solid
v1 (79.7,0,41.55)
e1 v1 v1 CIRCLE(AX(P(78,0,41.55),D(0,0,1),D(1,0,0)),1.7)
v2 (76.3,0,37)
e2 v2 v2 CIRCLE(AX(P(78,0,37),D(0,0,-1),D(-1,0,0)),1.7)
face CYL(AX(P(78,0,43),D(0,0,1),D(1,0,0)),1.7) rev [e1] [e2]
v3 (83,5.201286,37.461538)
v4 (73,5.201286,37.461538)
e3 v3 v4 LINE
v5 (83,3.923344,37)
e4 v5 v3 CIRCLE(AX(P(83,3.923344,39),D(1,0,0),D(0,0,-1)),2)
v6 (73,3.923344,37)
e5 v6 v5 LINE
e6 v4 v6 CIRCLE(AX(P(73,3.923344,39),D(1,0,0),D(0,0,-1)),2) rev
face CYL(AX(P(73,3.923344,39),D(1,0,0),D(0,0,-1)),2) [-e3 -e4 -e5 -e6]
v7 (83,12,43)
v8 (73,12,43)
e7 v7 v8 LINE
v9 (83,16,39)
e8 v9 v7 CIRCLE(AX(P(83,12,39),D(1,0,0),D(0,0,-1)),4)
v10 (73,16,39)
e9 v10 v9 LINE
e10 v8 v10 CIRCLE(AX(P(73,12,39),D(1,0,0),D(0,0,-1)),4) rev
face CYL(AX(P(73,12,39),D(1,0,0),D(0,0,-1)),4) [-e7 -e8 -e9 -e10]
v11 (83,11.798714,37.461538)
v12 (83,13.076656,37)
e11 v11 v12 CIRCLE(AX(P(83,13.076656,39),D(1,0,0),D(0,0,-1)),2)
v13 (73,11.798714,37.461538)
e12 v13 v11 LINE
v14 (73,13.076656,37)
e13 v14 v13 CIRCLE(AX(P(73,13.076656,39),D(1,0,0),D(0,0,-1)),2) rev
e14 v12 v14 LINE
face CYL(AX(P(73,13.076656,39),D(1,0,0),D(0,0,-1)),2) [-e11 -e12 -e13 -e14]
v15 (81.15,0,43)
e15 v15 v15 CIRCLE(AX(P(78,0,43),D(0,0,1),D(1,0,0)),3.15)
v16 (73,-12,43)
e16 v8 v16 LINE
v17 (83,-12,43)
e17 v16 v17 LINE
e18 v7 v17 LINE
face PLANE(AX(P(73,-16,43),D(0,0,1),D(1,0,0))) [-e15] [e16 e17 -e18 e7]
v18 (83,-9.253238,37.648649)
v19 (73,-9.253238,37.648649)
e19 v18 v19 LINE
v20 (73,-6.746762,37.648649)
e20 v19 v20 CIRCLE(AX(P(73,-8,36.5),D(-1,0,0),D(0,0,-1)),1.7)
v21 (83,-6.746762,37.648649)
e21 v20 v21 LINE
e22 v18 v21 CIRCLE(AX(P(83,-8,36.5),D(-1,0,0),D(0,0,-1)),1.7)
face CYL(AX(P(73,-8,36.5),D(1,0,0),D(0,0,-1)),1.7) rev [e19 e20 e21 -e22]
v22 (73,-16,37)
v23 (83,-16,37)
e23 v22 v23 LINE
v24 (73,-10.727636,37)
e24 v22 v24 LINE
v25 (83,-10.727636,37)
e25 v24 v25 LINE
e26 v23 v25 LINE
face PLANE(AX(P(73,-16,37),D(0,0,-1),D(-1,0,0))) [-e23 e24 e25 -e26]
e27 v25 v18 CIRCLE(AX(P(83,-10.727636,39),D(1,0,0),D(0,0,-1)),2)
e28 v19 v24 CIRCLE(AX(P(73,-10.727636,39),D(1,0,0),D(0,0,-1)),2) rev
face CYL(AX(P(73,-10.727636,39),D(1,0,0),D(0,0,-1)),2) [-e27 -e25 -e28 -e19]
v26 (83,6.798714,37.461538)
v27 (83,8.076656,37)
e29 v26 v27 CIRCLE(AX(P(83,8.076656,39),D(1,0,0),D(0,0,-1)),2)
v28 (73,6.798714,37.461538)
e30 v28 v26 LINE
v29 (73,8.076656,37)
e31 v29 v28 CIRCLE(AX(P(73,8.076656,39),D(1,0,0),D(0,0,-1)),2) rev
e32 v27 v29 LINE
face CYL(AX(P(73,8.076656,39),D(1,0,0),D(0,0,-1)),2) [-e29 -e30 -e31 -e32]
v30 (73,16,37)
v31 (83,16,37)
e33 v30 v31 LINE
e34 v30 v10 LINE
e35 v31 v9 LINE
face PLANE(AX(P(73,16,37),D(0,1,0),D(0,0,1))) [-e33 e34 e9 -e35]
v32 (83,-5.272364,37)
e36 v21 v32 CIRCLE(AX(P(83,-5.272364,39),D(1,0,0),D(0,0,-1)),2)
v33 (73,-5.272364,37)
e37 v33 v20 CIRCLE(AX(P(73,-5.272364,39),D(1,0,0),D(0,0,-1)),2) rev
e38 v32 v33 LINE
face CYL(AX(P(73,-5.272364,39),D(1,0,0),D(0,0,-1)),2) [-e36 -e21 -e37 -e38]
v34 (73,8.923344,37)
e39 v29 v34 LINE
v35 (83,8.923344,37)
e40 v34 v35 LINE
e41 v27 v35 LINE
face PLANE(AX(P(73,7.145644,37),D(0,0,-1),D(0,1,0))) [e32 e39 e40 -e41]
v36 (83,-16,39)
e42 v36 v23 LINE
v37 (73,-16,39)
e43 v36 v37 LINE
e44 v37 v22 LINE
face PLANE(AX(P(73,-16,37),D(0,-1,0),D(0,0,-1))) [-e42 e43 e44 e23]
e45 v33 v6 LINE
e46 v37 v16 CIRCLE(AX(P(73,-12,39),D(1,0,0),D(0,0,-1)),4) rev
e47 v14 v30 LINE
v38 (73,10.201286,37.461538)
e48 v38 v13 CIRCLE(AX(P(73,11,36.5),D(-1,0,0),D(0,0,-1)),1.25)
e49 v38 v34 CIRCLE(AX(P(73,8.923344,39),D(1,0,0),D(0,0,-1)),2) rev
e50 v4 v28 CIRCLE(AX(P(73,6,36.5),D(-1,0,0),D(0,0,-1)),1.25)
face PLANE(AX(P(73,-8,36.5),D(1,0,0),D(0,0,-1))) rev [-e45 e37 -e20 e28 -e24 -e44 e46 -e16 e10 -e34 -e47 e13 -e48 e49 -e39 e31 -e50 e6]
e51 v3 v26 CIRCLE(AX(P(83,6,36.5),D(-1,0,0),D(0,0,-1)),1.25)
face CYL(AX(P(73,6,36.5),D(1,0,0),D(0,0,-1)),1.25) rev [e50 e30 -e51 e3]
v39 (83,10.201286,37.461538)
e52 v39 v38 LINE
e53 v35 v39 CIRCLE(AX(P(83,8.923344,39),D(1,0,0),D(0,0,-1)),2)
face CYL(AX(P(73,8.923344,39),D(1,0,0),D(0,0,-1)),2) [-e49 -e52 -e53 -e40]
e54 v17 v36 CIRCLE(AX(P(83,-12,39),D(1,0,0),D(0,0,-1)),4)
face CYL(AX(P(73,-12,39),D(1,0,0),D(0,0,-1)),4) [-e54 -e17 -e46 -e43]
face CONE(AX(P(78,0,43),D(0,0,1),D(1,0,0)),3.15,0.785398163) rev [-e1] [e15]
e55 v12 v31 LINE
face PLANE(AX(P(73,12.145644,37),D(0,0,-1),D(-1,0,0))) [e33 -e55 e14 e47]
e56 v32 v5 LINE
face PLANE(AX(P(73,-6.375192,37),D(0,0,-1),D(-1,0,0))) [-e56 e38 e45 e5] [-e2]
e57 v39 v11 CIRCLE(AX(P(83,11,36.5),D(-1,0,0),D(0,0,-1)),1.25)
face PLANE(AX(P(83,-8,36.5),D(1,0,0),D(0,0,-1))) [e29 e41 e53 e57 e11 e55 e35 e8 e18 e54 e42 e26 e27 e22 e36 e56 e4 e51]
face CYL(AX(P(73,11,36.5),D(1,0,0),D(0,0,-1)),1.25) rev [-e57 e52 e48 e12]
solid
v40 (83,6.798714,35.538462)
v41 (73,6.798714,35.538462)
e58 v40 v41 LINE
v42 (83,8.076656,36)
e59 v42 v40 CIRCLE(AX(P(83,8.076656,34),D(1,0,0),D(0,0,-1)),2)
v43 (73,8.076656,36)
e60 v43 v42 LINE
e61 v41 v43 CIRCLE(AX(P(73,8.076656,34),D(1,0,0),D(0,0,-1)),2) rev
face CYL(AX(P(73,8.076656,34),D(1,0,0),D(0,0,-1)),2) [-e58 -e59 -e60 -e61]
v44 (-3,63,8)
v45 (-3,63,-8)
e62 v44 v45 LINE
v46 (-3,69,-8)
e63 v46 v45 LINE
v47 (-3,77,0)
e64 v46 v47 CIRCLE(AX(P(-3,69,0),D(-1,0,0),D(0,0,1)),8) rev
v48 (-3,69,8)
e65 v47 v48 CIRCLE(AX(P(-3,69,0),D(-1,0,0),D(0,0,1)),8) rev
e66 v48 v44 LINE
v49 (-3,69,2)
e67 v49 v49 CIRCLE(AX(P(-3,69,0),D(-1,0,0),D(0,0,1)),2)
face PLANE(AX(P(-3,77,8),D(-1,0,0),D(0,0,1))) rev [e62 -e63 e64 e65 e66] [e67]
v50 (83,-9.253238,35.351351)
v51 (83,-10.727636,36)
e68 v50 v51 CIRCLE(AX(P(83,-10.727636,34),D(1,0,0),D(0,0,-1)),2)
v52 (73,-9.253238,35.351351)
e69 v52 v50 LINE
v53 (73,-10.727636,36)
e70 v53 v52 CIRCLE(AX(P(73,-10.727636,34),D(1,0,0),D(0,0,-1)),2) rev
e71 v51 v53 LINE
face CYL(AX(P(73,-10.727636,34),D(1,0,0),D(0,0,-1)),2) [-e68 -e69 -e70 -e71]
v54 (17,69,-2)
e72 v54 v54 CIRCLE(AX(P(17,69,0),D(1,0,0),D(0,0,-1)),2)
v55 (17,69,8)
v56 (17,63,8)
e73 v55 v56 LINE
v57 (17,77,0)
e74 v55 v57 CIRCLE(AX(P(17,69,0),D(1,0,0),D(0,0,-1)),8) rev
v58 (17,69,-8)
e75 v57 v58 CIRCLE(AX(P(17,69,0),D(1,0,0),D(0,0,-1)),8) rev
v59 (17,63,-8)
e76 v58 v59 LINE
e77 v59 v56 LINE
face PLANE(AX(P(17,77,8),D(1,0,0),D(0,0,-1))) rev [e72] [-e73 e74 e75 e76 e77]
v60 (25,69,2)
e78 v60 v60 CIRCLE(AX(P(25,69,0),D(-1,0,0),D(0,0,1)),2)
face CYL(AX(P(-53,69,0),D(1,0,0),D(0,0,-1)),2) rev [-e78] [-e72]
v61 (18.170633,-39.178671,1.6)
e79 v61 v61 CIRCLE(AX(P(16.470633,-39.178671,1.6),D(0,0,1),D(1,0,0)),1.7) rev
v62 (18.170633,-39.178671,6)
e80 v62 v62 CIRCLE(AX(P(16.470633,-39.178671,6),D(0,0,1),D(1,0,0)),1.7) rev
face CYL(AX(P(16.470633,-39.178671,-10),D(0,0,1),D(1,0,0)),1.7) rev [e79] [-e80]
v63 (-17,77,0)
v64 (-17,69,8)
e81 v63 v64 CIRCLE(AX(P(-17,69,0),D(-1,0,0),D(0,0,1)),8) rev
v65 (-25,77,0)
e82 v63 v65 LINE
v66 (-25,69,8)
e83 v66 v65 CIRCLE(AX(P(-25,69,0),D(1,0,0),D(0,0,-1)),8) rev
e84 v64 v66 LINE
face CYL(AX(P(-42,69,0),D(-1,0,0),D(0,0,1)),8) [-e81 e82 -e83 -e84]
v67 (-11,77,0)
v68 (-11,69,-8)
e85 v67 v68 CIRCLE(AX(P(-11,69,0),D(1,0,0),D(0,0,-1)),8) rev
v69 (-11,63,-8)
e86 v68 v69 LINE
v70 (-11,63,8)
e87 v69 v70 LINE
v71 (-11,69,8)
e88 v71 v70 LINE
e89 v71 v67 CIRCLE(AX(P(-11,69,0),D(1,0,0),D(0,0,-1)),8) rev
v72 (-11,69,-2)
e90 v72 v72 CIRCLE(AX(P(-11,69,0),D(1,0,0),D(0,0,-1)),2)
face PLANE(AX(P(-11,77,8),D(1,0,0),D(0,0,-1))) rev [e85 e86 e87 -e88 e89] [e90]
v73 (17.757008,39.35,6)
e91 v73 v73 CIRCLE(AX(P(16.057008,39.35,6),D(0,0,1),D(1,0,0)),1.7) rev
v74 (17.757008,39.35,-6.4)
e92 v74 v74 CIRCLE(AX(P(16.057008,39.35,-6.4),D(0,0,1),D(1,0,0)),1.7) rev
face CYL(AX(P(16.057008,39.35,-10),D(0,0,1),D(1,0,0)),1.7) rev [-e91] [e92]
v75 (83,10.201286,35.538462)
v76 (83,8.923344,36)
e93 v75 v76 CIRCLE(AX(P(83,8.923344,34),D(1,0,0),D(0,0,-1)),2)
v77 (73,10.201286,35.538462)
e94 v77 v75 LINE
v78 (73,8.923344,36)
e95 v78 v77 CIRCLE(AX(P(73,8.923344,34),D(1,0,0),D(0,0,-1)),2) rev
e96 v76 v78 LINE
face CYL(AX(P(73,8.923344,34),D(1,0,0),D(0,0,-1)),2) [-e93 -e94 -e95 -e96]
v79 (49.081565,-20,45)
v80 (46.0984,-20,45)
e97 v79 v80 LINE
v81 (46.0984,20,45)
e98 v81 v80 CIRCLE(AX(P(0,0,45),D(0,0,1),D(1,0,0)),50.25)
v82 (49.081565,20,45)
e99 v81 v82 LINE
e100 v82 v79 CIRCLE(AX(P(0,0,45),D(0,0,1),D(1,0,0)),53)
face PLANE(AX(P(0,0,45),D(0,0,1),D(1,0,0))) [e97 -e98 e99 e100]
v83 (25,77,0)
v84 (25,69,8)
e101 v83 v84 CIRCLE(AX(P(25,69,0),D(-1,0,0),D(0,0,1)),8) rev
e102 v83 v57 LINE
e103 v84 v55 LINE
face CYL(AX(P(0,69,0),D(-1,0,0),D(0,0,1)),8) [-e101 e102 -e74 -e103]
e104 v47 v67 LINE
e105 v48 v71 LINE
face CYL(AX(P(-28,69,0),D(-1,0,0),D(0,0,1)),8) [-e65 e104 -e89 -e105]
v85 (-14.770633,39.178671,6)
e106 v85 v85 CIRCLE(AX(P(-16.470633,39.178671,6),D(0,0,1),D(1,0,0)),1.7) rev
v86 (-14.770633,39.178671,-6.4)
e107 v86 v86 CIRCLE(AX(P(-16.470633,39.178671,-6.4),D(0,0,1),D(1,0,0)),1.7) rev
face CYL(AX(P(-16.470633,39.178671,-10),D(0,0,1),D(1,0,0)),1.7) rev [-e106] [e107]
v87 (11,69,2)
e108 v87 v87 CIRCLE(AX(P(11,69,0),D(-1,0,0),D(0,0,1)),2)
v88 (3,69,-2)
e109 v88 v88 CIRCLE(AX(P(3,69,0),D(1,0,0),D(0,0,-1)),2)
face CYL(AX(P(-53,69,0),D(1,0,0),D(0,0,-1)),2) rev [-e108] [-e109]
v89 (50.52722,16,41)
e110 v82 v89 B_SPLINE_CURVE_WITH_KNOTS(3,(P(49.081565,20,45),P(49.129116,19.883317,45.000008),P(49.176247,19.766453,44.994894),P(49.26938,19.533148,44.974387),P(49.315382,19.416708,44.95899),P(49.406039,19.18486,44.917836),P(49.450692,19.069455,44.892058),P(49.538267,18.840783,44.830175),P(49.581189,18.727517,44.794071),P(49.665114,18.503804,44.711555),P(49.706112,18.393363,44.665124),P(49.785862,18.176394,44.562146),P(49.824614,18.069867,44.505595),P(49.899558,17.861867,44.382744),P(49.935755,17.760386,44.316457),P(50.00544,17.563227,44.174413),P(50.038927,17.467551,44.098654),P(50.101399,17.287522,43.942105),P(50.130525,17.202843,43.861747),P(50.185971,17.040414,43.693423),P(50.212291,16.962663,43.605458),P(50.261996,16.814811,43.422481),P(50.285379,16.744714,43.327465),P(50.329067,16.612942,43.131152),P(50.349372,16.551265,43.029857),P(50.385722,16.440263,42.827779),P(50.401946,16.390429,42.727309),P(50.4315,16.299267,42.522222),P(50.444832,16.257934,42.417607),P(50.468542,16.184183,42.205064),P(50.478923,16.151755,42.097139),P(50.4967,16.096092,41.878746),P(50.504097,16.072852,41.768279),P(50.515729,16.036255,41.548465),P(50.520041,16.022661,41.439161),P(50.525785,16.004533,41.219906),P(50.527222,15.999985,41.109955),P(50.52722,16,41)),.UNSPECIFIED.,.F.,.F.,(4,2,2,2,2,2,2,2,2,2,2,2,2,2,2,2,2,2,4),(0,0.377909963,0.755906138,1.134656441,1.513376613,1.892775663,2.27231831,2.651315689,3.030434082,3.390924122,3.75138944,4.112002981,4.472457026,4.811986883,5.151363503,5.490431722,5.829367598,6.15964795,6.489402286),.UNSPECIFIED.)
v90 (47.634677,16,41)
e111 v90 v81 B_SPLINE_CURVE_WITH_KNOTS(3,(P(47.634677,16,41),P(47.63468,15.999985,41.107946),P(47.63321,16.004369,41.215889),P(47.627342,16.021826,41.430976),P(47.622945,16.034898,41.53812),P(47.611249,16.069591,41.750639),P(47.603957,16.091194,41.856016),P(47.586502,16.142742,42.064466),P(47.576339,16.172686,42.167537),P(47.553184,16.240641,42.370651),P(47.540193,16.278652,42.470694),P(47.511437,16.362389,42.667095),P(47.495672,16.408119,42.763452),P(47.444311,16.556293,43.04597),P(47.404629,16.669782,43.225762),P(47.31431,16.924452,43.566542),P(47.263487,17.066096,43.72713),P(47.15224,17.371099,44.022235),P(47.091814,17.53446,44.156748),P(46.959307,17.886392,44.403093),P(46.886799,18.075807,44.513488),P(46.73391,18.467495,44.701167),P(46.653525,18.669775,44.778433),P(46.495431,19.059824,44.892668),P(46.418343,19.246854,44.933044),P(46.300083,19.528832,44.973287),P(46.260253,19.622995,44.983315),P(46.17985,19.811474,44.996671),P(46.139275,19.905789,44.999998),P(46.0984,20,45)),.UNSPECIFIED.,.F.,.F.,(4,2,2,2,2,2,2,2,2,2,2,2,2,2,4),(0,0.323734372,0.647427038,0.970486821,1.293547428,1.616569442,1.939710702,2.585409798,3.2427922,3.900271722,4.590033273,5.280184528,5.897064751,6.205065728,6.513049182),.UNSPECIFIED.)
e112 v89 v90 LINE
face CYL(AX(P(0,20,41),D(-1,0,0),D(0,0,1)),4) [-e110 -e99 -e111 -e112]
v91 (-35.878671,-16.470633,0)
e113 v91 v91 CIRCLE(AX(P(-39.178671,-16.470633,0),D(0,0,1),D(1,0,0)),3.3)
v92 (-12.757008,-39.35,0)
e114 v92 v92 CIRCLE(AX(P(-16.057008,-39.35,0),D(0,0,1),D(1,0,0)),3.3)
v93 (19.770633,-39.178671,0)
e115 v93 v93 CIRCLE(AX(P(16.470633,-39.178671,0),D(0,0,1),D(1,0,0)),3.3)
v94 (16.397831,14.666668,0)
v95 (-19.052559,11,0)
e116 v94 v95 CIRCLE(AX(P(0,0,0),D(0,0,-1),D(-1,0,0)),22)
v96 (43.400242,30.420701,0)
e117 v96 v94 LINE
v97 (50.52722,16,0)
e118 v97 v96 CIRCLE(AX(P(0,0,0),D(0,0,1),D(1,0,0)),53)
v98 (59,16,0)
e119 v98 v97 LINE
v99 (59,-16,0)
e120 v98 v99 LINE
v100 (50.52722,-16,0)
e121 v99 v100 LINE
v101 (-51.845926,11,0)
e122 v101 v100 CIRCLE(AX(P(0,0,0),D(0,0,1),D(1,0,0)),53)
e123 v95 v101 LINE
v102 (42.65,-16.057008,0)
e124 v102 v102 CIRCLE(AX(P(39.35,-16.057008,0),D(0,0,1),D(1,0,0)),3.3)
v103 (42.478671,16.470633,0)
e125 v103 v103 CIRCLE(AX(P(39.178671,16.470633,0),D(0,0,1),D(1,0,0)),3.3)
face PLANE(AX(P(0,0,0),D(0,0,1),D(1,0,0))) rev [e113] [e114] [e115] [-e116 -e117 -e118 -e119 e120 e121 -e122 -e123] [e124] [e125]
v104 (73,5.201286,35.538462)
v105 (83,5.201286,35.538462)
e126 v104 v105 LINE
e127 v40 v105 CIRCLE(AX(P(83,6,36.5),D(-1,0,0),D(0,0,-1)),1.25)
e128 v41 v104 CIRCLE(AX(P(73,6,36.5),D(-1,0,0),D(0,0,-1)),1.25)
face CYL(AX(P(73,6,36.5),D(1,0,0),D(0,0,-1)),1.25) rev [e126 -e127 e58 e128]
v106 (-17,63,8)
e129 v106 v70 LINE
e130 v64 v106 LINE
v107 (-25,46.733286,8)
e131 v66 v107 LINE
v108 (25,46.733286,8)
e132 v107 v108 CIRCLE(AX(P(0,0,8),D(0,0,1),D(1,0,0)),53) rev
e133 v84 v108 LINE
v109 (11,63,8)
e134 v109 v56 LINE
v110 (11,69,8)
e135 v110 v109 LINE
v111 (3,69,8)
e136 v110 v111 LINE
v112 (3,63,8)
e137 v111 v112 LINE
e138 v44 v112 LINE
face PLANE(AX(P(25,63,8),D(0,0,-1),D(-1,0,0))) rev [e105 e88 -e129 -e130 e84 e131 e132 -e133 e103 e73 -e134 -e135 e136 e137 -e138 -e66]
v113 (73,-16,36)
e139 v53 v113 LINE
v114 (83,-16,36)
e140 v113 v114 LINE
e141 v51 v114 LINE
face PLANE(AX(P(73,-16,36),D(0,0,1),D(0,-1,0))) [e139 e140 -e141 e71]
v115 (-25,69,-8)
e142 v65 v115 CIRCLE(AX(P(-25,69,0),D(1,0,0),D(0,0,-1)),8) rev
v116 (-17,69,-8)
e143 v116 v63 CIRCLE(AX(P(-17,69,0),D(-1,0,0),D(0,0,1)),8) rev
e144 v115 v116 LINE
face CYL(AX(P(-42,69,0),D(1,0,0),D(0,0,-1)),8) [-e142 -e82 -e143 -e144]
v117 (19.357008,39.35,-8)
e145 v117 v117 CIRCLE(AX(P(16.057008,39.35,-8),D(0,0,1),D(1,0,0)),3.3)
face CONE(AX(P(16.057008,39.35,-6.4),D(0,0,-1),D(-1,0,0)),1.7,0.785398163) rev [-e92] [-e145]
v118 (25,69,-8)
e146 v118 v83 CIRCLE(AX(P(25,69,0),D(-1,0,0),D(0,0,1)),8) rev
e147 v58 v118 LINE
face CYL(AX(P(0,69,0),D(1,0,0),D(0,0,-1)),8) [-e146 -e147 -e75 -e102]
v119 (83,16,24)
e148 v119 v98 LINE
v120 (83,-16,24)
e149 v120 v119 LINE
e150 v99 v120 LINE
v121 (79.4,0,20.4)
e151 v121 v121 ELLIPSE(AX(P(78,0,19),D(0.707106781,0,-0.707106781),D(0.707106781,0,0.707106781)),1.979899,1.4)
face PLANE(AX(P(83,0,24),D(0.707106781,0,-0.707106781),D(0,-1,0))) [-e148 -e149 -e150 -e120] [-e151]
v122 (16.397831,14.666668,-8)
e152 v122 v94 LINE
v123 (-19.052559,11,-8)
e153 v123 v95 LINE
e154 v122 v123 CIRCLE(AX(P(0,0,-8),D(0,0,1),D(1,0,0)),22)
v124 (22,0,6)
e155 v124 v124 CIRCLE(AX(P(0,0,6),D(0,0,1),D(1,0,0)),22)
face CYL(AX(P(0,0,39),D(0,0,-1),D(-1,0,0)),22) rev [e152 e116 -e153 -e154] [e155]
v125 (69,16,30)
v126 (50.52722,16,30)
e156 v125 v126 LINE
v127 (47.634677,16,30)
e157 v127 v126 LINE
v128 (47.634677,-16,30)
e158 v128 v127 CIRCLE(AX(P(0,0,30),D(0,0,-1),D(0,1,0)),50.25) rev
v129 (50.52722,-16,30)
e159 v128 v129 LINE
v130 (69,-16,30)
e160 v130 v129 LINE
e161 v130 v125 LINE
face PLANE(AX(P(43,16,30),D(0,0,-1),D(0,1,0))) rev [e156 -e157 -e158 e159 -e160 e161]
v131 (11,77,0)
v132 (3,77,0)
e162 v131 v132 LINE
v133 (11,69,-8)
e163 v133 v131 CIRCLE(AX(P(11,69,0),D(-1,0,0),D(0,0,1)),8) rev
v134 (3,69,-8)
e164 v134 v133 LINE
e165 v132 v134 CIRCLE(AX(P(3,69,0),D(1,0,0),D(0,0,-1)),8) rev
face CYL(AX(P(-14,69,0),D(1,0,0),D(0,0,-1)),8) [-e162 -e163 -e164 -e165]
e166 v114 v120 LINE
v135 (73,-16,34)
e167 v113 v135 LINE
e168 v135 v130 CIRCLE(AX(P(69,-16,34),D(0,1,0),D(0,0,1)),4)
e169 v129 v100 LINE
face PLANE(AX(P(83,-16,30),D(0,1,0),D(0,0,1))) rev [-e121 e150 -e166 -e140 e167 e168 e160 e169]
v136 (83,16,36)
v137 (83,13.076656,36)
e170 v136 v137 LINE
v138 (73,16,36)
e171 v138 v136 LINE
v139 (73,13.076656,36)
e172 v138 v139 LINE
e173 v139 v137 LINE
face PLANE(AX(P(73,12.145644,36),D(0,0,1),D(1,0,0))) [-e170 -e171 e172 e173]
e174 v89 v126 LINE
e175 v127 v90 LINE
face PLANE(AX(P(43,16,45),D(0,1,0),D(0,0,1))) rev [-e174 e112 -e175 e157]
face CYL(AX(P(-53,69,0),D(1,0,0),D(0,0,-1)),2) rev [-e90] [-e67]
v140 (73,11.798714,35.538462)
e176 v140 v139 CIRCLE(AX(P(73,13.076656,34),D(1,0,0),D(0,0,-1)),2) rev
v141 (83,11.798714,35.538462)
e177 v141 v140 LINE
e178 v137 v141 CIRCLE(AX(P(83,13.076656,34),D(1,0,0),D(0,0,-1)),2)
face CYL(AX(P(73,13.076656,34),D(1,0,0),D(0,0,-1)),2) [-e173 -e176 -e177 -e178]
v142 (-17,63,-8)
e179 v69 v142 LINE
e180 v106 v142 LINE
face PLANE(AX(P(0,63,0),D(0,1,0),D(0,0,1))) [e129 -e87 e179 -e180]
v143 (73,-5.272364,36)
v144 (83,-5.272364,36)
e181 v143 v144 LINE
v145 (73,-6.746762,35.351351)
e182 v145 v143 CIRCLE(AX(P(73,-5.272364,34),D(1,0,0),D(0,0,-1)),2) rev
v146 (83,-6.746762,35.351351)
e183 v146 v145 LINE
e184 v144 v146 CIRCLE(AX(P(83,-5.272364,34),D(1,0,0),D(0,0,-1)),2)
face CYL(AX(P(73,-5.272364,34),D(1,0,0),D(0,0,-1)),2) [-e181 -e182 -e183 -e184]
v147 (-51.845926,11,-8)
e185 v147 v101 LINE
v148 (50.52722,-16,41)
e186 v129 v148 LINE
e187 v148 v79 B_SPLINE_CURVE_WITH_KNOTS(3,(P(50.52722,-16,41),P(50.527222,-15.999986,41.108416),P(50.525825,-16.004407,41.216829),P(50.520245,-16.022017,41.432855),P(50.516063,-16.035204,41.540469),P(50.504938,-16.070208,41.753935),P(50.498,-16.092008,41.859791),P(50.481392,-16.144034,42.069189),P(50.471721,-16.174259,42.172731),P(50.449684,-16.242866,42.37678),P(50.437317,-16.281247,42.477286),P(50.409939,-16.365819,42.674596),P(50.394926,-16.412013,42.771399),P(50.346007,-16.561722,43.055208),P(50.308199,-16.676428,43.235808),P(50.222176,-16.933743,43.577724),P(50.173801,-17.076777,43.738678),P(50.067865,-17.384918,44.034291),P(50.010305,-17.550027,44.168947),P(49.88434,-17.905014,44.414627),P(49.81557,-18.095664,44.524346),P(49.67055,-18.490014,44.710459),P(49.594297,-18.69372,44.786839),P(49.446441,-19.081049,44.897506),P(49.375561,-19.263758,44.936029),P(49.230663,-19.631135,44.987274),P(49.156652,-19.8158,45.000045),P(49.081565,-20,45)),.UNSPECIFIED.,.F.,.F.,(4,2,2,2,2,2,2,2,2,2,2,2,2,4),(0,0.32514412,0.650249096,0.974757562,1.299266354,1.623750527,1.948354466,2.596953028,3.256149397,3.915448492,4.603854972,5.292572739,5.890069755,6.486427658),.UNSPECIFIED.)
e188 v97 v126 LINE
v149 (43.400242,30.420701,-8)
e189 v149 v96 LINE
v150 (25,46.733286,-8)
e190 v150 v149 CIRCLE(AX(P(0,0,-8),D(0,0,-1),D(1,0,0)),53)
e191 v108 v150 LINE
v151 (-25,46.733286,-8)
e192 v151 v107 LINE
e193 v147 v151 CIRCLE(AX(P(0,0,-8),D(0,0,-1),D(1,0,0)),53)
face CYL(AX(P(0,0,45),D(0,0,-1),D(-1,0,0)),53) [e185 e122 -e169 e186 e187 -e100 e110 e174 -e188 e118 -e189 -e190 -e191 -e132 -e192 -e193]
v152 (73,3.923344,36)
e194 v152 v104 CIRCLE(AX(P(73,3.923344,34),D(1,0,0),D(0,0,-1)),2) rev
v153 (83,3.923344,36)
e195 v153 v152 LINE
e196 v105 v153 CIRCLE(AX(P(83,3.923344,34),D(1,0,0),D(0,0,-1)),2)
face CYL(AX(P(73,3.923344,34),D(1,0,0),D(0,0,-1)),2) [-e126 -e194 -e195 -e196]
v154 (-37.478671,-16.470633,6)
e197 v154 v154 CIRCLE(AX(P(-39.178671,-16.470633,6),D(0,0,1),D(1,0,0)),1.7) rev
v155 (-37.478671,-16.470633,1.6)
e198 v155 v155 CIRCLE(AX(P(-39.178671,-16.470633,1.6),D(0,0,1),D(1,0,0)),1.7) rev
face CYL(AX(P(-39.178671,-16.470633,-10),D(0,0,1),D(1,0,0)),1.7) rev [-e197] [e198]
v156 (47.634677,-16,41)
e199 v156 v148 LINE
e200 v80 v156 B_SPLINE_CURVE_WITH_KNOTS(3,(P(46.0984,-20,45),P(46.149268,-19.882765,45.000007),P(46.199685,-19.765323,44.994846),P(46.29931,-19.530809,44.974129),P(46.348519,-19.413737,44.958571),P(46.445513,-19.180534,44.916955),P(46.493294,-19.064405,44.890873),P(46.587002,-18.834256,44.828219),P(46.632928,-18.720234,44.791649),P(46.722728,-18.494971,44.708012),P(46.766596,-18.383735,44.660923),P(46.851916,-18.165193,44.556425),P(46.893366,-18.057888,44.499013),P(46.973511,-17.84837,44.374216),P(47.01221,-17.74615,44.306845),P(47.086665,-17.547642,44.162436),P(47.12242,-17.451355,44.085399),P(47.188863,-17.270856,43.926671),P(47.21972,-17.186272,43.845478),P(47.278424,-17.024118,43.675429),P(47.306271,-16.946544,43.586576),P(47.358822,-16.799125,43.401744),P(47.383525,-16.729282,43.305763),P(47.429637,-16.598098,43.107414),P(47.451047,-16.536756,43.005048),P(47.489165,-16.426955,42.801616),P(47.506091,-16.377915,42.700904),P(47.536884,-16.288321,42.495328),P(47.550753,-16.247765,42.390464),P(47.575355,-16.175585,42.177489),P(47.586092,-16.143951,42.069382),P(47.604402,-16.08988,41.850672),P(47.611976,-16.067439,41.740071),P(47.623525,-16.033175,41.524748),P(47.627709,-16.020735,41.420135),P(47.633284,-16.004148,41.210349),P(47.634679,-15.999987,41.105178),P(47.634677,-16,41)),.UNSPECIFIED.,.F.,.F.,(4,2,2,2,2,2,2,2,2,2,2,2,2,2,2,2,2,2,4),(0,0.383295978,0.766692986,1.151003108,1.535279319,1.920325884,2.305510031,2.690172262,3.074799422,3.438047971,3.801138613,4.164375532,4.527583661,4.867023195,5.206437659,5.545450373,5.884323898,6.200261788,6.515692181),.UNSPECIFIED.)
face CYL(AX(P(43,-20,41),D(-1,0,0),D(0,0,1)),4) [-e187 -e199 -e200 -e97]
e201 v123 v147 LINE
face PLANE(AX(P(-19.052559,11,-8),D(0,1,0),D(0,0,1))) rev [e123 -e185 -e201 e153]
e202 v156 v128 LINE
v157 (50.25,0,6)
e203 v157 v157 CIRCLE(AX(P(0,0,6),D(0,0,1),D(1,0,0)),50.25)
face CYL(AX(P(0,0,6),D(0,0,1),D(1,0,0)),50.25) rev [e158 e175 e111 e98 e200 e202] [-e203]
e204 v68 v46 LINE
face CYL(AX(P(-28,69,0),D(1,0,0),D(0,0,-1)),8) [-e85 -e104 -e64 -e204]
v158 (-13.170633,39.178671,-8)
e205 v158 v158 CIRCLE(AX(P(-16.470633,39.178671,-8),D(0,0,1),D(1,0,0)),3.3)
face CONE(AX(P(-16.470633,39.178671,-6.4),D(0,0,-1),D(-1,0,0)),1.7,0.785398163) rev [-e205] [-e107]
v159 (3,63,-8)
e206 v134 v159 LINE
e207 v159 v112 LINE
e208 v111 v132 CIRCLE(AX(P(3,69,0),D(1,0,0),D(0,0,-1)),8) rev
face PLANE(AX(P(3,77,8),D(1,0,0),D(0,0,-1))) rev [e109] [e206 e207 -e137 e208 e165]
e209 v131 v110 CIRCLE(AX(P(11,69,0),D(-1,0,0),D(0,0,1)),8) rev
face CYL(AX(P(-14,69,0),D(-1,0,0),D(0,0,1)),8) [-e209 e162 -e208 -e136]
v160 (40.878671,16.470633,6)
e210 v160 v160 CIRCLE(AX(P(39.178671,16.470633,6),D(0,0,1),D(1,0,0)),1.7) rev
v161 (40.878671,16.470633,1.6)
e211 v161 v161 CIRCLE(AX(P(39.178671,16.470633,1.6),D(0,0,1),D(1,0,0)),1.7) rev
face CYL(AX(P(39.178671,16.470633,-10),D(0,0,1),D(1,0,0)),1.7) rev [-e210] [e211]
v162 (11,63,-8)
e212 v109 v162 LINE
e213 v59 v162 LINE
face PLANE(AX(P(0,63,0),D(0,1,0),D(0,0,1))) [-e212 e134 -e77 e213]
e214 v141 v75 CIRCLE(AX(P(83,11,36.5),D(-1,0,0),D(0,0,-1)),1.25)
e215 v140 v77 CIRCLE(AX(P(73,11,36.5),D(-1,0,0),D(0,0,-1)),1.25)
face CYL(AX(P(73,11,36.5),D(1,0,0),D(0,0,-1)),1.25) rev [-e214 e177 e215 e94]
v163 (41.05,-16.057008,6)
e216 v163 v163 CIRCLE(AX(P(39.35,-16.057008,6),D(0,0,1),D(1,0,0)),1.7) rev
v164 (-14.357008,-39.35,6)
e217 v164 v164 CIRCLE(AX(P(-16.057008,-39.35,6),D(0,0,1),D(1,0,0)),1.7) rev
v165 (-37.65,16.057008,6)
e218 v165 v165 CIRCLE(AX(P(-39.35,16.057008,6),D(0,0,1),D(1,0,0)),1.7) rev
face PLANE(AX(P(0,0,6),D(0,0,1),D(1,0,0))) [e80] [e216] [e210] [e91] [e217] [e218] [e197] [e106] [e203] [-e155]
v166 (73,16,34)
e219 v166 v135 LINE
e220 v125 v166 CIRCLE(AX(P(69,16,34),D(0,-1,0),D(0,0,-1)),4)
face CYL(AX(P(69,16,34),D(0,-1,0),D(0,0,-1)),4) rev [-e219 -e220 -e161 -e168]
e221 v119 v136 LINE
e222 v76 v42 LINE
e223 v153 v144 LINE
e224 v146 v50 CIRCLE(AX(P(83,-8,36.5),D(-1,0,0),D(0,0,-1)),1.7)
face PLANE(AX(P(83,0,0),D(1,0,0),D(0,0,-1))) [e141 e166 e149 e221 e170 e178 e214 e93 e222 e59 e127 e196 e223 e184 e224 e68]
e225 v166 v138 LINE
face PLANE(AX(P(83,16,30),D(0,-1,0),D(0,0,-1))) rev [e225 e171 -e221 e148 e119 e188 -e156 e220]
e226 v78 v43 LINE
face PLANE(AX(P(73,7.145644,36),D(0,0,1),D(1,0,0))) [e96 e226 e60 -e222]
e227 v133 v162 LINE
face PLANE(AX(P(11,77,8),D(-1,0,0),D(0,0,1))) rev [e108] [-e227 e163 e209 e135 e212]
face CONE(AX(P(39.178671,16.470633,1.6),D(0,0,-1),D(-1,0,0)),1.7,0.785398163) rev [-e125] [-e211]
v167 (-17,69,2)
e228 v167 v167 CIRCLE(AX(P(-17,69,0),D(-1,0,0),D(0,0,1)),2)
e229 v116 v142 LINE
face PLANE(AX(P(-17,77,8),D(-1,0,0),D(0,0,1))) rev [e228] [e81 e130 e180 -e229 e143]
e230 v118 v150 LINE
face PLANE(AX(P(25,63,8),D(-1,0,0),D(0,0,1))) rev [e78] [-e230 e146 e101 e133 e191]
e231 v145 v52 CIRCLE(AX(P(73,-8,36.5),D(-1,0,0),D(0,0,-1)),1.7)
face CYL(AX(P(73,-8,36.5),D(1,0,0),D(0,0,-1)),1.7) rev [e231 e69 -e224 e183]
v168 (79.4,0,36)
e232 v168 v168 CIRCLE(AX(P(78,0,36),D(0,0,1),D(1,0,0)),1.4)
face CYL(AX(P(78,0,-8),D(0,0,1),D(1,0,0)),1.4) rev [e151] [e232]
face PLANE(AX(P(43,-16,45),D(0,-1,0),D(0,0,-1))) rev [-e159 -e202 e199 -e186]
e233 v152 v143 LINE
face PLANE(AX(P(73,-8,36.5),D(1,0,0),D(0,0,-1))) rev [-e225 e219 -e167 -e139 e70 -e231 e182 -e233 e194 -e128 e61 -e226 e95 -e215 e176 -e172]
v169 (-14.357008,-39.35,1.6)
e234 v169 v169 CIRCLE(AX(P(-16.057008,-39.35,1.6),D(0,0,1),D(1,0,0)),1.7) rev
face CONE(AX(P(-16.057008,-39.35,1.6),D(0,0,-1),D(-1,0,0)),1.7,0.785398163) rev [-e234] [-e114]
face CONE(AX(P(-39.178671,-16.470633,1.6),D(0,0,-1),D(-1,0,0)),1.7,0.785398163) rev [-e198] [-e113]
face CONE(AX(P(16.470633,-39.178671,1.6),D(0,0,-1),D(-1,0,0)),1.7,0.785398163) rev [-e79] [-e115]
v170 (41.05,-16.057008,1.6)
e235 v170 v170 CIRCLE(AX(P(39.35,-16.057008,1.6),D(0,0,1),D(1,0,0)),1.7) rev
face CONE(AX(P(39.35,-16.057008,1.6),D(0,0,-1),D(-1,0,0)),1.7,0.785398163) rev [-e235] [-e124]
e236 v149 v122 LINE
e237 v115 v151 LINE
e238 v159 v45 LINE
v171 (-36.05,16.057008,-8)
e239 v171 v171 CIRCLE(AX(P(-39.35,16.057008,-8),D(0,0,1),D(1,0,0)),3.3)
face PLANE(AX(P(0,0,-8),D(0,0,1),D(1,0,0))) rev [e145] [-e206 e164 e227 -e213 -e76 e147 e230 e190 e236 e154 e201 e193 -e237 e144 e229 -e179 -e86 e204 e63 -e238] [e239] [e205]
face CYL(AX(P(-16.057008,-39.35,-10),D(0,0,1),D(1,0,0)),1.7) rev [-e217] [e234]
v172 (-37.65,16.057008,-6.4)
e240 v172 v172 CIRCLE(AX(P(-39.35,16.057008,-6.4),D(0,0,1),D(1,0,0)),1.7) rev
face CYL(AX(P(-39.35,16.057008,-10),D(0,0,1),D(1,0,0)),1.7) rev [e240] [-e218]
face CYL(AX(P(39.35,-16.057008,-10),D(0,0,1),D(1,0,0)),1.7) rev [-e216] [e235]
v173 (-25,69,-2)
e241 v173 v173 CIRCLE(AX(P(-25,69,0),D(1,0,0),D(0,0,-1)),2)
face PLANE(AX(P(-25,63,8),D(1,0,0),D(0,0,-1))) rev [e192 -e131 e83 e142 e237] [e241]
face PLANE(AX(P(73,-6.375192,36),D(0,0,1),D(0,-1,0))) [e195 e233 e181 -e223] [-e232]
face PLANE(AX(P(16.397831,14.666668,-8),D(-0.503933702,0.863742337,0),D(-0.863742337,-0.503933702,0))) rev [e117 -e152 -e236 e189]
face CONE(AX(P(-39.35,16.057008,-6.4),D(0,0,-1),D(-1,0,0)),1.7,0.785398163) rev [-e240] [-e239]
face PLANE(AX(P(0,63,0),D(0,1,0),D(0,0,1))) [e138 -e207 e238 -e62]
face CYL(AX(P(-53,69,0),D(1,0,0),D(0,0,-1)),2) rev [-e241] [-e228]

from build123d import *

# Parameters (mm, degrees)
SKETCH1_R               = 53
BOSS_EXTRUDE2_DEPTH     = 45
SKETCH2_R               = 50.25
CUT_EXTRUDE1_DEPTH      = 39
SKETCH4_R               = 22
CUT_EXTRUDE3_DEPTH      = 39
BOSS_EXTRUDE3_START     = 8
BOSS_EXTRUDE3_DEPTH     = 8
CUT_EXTRUDE5_DEPTH      = 10
CUT_EXTRUDE5_DEPTH_BACK = 10
SKETCH10_R              = 1.7
BOSS_EXTRUDE6_START     = -8
BOSS_EXTRUDE6_DEPTH     = 16
SKETCH13_W              = 8
SKETCH13_H              = 16
BOSS_EXTRUDE7_DEPTH     = 14
FILLET1_R               = 8
LPATTERN1_COUNT         = 4
LPATTERN1_PITCH         = 14
FILLET1_OF_LPATTERN1_R  = 8
CUT_EXTRUDE6_DEPTH      = 119.482066153
CUT_EXTRUDE6_DEPTH_BACK = 119.482066153
SKETCH14_R              = 2
CHAMFER1_SIZE           = 1.6
SKETCH15_W              = 15
SKETCH15_H              = 32
CUT_EXTRUDE7_DEPTH      = 10
BOSS_EXTRUDE8_START     = -2.47278
SKETCH17_W              = 30
SKETCH17_H              = 32
BOSS_EXTRUDE8_DEPTH     = 32.47278
CHAMFER2_SIZE           = 24
BOSS_EXTRUDE9_DEPTH     = 10
SKETCH25_R              = 1.4
CUT_EXTRUDE9_DEPTH      = 122.466044638
FILLET2_R               = 2
FILLET3_R               = 2
FILLET4_R               = 4
FILLET5_R               = 4
FILLET6_R               = 4


# Read off the part's stored shape, not the designer's step: Boss-Extrude6
with BuildPart() as part:
    # Sketch1 → Boss-Extrude2 (new body)
    with BuildSketch(Plane.XY):
        with Locations(Location((0, 0, 0), (0, 0, 180))):
            Circle(SKETCH1_R)
    extrude(amount=BOSS_EXTRUDE2_DEPTH)

    # Sketch2 → Cut-Extrude1 (cut)
    with BuildSketch(Plane.XY.offset(45)):
        Circle(SKETCH2_R)
    extrude(amount=-CUT_EXTRUDE1_DEPTH, mode=Mode.SUBTRACT)

    # Sketch4 → Cut-Extrude3 (cut)
    with BuildSketch(Plane(origin=(0, 0, 0), x_dir=(-1, 0, 0), z_dir=(0, 0, -1))):
        Circle(SKETCH4_R)
    extrude(amount=-CUT_EXTRUDE3_DEPTH, mode=Mode.SUBTRACT)

    # Sketch5 → Boss-Extrude3 (add)
    with BuildSketch(Plane(origin=(0, 0, 0), x_dir=(-1, 0, 0), z_dir=(0, 0, -1)).offset(BOSS_EXTRUDE3_START)):
        with BuildLine():
            Line((19.052558883, 11), (51.845925587, 11))
            ThreePointArc((51.845925587, 11), (10.588828865, 51.931461594), (-43.400241675, 30.42070056))
            Line((-43.400241675, 30.42070056), (-16.397830673, 14.666667965))
            ThreePointArc((-16.397830673, 14.666667965), (2.263406494, 21.883258236), (19.052558883, 11))
        make_face()
    extrude(amount=-BOSS_EXTRUDE3_DEPTH)

    # Sketch10 → Cut-Extrude5 (cut, two sides: drawn at the far end of the back side and taken through both)
    with BuildSketch(Plane(origin=(0, 0, 0), x_dir=(-1, 0, 0), z_dir=(0, 0, -1)).offset(-CUT_EXTRUDE5_DEPTH_BACK)):
        with Locations(Location((-39.35, -16.057007816, 0), (0, 0, 180))):
            Circle(SKETCH10_R)
        with Locations(Location((-39.178670952, 16.470632727, 0), (0, 0, 180))):
            Circle(SKETCH10_R)
        with Locations(Location((-16.057007816, 39.35, 0), (0, 0, 180))):
            Circle(SKETCH10_R)
        with Locations(Location((16.470632727, 39.178670952, 0), (0, 0, 180))):
            Circle(SKETCH10_R)
        with Locations(Location((39.35, 16.057007816, 0), (0, 0, 180))):
            Circle(SKETCH10_R)
        with Locations(Location((39.178670952, -16.470632727, 0), (0, 0, 180))):
            Circle(SKETCH10_R)
        with Locations(Location((16.057007816, -39.35, 0), (0, 0, 180))):
            Circle(SKETCH10_R)
        with Locations(Location((-16.470632728, -39.178670952, 0), (0, 0, 180))):
            Circle(SKETCH10_R)
    extrude(amount=CUT_EXTRUDE5_DEPTH + CUT_EXTRUDE5_DEPTH_BACK, mode=Mode.SUBTRACT)

    # Boss-Extrude6 outline → Boss-Extrude6 (add)
    with BuildSketch(Plane.XY.offset(BOSS_EXTRUDE6_START)):
        with BuildLine():
            Line((-25, 63), (-25, 46.733285782))
            ThreePointArc((-25, 46.733285782), (0, 53), (25, 46.733285782))
            Line((25, 46.733285782), (25, 63))
            Line((25, 63), (-25, 63))
        make_face()
    extrude(amount=BOSS_EXTRUDE6_DEPTH)

    # Sketch13 → Boss-Extrude7 (add)
    with BuildSketch(Plane(origin=(0, 63, 0), x_dir=(1, 0, 0), z_dir=(0, 1, 0))):
        with Locations((21, 0)):
            Rectangle(SKETCH13_W, SKETCH13_H)
    boss_extrude7 = extrude(amount=BOSS_EXTRUDE7_DEPTH)

    # Fillet1
    fillet1_edges = [part.edges().sort_by_distance(p)[0] for p in [
        (21, 77, 8),
        (21, 77, -8),
    ]]
    fillet(fillet1_edges, radius=FILLET1_R - 0.0001)  # a hair under: the kernel refuses the full size

    # LPattern1: Boss-Extrude7 ×4
    with Locations(*[(-i * LPATTERN1_PITCH, 0, 0) for i in range(1, LPATTERN1_COUNT)]):
        add(boss_extrude7)

    # Fillet1 of LPattern1
    fillet1_of_lpattern1_edges = [part.edges().sort_by_distance(p)[0] for p in [
        (7, 77, 8),
        (7, 77, -8),
        (-7, 77, 8),
        (-7, 77, -8),
        (-21, 77, 8),
        (-21, 77, -8),
    ]]
    fillet(fillet1_of_lpattern1_edges, radius=FILLET1_OF_LPATTERN1_R - 0.0001)  # a hair under: the kernel refuses the full size

    # Sketch14 → Cut-Extrude6 (cut, two sides: drawn at the far end of the back side and taken through both)
    with BuildSketch(Plane(origin=(25, 0, 0), x_dir=(0, 0, -1), z_dir=(1, 0, 0)).offset(-CUT_EXTRUDE6_DEPTH_BACK)):
        with Locations((0, 69)):
            Circle(SKETCH14_R)
    extrude(amount=CUT_EXTRUDE6_DEPTH + CUT_EXTRUDE6_DEPTH_BACK, mode=Mode.SUBTRACT)

    # Chamfer1
    chamfer1_edges = [part.edges().sort_by_distance(p)[0] for p in [
        (14.770632728, -39.178670952, 0),
        (-17.757007816, -39.35, 0),
        (-40.878670952, -16.470632727, 0),
        (-41.05, 16.057007816, -8),
        (-18.170632727, 39.178670952, -8),
        (14.357007816, 39.35, -8),
        (37.478670952, 16.470632727, 0),
        (37.65, -16.057007816, 0),
    ]]
    chamfer(chamfer1_edges, length=CHAMFER1_SIZE)

    # Sketch15 → Cut-Extrude7 (cut)
    with BuildSketch(Plane(origin=(53, 0, 0), x_dir=(0, 0, -1), z_dir=(1, 0, 0))):
        with Locations((-37.5, 0)):
            Rectangle(SKETCH15_W, SKETCH15_H)
    extrude(amount=-CUT_EXTRUDE7_DEPTH, mode=Mode.SUBTRACT)

    # Sketch17 → Boss-Extrude8 (add)
    with BuildSketch(Plane(origin=(53, 0, 0), x_dir=(0, 0, -1), z_dir=(1, 0, 0)).offset(BOSS_EXTRUDE8_START)):
        with Locations((-15, 0)):
            Rectangle(SKETCH17_W, SKETCH17_H)
    extrude(amount=BOSS_EXTRUDE8_DEPTH)

    # Chamfer2
    chamfer2_edges = [part.edges().sort_by_distance(p)[0] for p in [
        (83, 0, 0),
    ]]
    chamfer(chamfer2_edges, length=CHAMFER2_SIZE)

    # Sketch18 → Boss-Extrude9 (add)
    with BuildSketch(Plane(origin=(83, 0, 0), x_dir=(0, 0, -1), z_dir=(1, 0, 0))):
        with BuildLine():
            Line((-36, -16), (-30, -16))
            Line((-30, -16), (-30, 16))
            Line((-30, 16), (-36, 16))
            Line((-36, 16), (-36, 12.145643924))
            ThreePointArc((-36, 12.145643924), (-35.25, 11), (-36, 9.854356076))
            Line((-36, 9.854356076), (-36, 7.145643924))
            ThreePointArc((-36, 7.145643924), (-35.25, 6), (-36, 4.854356076))
            Line((-36, 4.854356076), (-36, -6.375192319))
            ThreePointArc((-36, -6.375192319), (-34.8, -8), (-36, -9.624807681))
            Line((-36, -9.624807681), (-36, -16))
        make_face()
        with BuildLine():
            Line((-37, -16), (-43, -16))
            Line((-43, -16), (-43, 16))
            Line((-43, 16), (-37, 16))
            Line((-37, 16), (-37, 12.145643924))
            ThreePointArc((-37, 12.145643924), (-37.75, 11), (-37, 9.854356076))
            Line((-37, 9.854356076), (-37, 7.145643924))
            ThreePointArc((-37, 7.145643924), (-37.75, 6), (-37, 4.854356076))
            Line((-37, 4.854356076), (-37, -6.375192319))
            ThreePointArc((-37, -6.375192319), (-38.2, -8), (-37, -9.624807681))
            Line((-37, -9.624807681), (-37, -16))
        make_face()
    extrude(amount=-BOSS_EXTRUDE9_DEPTH)


with BuildPart() as boss_extrude9_piece_1:
    # of the separate pieces the step leaves, piece 1, a body of its own (boss_extrude9_pieces)
    add(part.part.solids().sort_by_distance((59, 16, 0))[0])

    # Sketch25 → Cut-Extrude9 (cut, through all)
    with BuildSketch(Plane.XY.offset(36)):
        with Locations((78, 0)):
            Circle(SKETCH25_R)
    extrude(amount=-CUT_EXTRUDE9_DEPTH, mode=Mode.SUBTRACT)

    # Fillet2
    fillet2_edges = [boss_extrude9_piece_1.edges().sort_by_distance(p)[0] for p in [
        (78, -9.624807681, 36),
        (78, -6.375192319, 36),
        (78, 4.854356076, 36),
        (78, 7.145643924, 36),
        (78, 9.854356076, 36),
        (78, 12.145643924, 36),
    ]]
    fillet(fillet2_edges, radius=FILLET2_R)

    # Fillet4
    fillet4_edges = [boss_extrude9_piece_1.edges().sort_by_distance(p)[0] for p in [
        (73, 0, 30),
    ]]
    fillet(fillet4_edges, radius=FILLET4_R)

    # Fillet5
    fillet5_edges = [boss_extrude9_piece_1.edges().sort_by_distance(p)[0] for p in [
        (49.080948941, -16, 45),
        (49.080948941, 16, 45),
    ]]
    fillet(fillet5_edges, radius=FILLET5_R)


with BuildPart() as boss_extrude9_piece_2:
    # of the separate pieces the step leaves, piece 2, a body of its own (boss_extrude9_pieces)
    add(part.part.solids().sort_by_distance((83, -9.624807681, 37))[0])

    # Sketch22 → CSK for M3 Countersunk Flat Head Screw1 (revolve, cut)
    with BuildSketch(Plane(origin=(78, 0, 43), x_dir=(0, -1, 0), z_dir=(1, 0, 0))):
        Polygon((0, 0), (0, 24), (1.7, 24), (1.7, 1.45), (3.15, 0), align=None)
    revolve(axis=Axis((78, 0, 49.35), (0, 0, -1)), mode=Mode.SUBTRACT)

    # Fillet3
    fillet3_edges = [boss_extrude9_piece_2.edges().sort_by_distance(p)[0] for p in [
        (78, 12.145643924, 37),
        (78, 9.854356076, 37),
        (78, 7.145643924, 37),
        (78, 4.854356076, 37),
        (78, -6.375192319, 37),
        (78, -9.624807681, 37),
    ]]
    fillet(fillet3_edges, radius=FILLET3_R)

    # Fillet6
    fillet6_edges = [boss_extrude9_piece_2.edges().sort_by_distance(p)[0] for p in [
        (78, -16, 43),
        (78, 16, 43),
    ]]
    fillet(fillet6_edges, radius=FILLET6_R)


solid = Compound([boss_extrude9_piece_1.part, boss_extrude9_piece_2.part])
